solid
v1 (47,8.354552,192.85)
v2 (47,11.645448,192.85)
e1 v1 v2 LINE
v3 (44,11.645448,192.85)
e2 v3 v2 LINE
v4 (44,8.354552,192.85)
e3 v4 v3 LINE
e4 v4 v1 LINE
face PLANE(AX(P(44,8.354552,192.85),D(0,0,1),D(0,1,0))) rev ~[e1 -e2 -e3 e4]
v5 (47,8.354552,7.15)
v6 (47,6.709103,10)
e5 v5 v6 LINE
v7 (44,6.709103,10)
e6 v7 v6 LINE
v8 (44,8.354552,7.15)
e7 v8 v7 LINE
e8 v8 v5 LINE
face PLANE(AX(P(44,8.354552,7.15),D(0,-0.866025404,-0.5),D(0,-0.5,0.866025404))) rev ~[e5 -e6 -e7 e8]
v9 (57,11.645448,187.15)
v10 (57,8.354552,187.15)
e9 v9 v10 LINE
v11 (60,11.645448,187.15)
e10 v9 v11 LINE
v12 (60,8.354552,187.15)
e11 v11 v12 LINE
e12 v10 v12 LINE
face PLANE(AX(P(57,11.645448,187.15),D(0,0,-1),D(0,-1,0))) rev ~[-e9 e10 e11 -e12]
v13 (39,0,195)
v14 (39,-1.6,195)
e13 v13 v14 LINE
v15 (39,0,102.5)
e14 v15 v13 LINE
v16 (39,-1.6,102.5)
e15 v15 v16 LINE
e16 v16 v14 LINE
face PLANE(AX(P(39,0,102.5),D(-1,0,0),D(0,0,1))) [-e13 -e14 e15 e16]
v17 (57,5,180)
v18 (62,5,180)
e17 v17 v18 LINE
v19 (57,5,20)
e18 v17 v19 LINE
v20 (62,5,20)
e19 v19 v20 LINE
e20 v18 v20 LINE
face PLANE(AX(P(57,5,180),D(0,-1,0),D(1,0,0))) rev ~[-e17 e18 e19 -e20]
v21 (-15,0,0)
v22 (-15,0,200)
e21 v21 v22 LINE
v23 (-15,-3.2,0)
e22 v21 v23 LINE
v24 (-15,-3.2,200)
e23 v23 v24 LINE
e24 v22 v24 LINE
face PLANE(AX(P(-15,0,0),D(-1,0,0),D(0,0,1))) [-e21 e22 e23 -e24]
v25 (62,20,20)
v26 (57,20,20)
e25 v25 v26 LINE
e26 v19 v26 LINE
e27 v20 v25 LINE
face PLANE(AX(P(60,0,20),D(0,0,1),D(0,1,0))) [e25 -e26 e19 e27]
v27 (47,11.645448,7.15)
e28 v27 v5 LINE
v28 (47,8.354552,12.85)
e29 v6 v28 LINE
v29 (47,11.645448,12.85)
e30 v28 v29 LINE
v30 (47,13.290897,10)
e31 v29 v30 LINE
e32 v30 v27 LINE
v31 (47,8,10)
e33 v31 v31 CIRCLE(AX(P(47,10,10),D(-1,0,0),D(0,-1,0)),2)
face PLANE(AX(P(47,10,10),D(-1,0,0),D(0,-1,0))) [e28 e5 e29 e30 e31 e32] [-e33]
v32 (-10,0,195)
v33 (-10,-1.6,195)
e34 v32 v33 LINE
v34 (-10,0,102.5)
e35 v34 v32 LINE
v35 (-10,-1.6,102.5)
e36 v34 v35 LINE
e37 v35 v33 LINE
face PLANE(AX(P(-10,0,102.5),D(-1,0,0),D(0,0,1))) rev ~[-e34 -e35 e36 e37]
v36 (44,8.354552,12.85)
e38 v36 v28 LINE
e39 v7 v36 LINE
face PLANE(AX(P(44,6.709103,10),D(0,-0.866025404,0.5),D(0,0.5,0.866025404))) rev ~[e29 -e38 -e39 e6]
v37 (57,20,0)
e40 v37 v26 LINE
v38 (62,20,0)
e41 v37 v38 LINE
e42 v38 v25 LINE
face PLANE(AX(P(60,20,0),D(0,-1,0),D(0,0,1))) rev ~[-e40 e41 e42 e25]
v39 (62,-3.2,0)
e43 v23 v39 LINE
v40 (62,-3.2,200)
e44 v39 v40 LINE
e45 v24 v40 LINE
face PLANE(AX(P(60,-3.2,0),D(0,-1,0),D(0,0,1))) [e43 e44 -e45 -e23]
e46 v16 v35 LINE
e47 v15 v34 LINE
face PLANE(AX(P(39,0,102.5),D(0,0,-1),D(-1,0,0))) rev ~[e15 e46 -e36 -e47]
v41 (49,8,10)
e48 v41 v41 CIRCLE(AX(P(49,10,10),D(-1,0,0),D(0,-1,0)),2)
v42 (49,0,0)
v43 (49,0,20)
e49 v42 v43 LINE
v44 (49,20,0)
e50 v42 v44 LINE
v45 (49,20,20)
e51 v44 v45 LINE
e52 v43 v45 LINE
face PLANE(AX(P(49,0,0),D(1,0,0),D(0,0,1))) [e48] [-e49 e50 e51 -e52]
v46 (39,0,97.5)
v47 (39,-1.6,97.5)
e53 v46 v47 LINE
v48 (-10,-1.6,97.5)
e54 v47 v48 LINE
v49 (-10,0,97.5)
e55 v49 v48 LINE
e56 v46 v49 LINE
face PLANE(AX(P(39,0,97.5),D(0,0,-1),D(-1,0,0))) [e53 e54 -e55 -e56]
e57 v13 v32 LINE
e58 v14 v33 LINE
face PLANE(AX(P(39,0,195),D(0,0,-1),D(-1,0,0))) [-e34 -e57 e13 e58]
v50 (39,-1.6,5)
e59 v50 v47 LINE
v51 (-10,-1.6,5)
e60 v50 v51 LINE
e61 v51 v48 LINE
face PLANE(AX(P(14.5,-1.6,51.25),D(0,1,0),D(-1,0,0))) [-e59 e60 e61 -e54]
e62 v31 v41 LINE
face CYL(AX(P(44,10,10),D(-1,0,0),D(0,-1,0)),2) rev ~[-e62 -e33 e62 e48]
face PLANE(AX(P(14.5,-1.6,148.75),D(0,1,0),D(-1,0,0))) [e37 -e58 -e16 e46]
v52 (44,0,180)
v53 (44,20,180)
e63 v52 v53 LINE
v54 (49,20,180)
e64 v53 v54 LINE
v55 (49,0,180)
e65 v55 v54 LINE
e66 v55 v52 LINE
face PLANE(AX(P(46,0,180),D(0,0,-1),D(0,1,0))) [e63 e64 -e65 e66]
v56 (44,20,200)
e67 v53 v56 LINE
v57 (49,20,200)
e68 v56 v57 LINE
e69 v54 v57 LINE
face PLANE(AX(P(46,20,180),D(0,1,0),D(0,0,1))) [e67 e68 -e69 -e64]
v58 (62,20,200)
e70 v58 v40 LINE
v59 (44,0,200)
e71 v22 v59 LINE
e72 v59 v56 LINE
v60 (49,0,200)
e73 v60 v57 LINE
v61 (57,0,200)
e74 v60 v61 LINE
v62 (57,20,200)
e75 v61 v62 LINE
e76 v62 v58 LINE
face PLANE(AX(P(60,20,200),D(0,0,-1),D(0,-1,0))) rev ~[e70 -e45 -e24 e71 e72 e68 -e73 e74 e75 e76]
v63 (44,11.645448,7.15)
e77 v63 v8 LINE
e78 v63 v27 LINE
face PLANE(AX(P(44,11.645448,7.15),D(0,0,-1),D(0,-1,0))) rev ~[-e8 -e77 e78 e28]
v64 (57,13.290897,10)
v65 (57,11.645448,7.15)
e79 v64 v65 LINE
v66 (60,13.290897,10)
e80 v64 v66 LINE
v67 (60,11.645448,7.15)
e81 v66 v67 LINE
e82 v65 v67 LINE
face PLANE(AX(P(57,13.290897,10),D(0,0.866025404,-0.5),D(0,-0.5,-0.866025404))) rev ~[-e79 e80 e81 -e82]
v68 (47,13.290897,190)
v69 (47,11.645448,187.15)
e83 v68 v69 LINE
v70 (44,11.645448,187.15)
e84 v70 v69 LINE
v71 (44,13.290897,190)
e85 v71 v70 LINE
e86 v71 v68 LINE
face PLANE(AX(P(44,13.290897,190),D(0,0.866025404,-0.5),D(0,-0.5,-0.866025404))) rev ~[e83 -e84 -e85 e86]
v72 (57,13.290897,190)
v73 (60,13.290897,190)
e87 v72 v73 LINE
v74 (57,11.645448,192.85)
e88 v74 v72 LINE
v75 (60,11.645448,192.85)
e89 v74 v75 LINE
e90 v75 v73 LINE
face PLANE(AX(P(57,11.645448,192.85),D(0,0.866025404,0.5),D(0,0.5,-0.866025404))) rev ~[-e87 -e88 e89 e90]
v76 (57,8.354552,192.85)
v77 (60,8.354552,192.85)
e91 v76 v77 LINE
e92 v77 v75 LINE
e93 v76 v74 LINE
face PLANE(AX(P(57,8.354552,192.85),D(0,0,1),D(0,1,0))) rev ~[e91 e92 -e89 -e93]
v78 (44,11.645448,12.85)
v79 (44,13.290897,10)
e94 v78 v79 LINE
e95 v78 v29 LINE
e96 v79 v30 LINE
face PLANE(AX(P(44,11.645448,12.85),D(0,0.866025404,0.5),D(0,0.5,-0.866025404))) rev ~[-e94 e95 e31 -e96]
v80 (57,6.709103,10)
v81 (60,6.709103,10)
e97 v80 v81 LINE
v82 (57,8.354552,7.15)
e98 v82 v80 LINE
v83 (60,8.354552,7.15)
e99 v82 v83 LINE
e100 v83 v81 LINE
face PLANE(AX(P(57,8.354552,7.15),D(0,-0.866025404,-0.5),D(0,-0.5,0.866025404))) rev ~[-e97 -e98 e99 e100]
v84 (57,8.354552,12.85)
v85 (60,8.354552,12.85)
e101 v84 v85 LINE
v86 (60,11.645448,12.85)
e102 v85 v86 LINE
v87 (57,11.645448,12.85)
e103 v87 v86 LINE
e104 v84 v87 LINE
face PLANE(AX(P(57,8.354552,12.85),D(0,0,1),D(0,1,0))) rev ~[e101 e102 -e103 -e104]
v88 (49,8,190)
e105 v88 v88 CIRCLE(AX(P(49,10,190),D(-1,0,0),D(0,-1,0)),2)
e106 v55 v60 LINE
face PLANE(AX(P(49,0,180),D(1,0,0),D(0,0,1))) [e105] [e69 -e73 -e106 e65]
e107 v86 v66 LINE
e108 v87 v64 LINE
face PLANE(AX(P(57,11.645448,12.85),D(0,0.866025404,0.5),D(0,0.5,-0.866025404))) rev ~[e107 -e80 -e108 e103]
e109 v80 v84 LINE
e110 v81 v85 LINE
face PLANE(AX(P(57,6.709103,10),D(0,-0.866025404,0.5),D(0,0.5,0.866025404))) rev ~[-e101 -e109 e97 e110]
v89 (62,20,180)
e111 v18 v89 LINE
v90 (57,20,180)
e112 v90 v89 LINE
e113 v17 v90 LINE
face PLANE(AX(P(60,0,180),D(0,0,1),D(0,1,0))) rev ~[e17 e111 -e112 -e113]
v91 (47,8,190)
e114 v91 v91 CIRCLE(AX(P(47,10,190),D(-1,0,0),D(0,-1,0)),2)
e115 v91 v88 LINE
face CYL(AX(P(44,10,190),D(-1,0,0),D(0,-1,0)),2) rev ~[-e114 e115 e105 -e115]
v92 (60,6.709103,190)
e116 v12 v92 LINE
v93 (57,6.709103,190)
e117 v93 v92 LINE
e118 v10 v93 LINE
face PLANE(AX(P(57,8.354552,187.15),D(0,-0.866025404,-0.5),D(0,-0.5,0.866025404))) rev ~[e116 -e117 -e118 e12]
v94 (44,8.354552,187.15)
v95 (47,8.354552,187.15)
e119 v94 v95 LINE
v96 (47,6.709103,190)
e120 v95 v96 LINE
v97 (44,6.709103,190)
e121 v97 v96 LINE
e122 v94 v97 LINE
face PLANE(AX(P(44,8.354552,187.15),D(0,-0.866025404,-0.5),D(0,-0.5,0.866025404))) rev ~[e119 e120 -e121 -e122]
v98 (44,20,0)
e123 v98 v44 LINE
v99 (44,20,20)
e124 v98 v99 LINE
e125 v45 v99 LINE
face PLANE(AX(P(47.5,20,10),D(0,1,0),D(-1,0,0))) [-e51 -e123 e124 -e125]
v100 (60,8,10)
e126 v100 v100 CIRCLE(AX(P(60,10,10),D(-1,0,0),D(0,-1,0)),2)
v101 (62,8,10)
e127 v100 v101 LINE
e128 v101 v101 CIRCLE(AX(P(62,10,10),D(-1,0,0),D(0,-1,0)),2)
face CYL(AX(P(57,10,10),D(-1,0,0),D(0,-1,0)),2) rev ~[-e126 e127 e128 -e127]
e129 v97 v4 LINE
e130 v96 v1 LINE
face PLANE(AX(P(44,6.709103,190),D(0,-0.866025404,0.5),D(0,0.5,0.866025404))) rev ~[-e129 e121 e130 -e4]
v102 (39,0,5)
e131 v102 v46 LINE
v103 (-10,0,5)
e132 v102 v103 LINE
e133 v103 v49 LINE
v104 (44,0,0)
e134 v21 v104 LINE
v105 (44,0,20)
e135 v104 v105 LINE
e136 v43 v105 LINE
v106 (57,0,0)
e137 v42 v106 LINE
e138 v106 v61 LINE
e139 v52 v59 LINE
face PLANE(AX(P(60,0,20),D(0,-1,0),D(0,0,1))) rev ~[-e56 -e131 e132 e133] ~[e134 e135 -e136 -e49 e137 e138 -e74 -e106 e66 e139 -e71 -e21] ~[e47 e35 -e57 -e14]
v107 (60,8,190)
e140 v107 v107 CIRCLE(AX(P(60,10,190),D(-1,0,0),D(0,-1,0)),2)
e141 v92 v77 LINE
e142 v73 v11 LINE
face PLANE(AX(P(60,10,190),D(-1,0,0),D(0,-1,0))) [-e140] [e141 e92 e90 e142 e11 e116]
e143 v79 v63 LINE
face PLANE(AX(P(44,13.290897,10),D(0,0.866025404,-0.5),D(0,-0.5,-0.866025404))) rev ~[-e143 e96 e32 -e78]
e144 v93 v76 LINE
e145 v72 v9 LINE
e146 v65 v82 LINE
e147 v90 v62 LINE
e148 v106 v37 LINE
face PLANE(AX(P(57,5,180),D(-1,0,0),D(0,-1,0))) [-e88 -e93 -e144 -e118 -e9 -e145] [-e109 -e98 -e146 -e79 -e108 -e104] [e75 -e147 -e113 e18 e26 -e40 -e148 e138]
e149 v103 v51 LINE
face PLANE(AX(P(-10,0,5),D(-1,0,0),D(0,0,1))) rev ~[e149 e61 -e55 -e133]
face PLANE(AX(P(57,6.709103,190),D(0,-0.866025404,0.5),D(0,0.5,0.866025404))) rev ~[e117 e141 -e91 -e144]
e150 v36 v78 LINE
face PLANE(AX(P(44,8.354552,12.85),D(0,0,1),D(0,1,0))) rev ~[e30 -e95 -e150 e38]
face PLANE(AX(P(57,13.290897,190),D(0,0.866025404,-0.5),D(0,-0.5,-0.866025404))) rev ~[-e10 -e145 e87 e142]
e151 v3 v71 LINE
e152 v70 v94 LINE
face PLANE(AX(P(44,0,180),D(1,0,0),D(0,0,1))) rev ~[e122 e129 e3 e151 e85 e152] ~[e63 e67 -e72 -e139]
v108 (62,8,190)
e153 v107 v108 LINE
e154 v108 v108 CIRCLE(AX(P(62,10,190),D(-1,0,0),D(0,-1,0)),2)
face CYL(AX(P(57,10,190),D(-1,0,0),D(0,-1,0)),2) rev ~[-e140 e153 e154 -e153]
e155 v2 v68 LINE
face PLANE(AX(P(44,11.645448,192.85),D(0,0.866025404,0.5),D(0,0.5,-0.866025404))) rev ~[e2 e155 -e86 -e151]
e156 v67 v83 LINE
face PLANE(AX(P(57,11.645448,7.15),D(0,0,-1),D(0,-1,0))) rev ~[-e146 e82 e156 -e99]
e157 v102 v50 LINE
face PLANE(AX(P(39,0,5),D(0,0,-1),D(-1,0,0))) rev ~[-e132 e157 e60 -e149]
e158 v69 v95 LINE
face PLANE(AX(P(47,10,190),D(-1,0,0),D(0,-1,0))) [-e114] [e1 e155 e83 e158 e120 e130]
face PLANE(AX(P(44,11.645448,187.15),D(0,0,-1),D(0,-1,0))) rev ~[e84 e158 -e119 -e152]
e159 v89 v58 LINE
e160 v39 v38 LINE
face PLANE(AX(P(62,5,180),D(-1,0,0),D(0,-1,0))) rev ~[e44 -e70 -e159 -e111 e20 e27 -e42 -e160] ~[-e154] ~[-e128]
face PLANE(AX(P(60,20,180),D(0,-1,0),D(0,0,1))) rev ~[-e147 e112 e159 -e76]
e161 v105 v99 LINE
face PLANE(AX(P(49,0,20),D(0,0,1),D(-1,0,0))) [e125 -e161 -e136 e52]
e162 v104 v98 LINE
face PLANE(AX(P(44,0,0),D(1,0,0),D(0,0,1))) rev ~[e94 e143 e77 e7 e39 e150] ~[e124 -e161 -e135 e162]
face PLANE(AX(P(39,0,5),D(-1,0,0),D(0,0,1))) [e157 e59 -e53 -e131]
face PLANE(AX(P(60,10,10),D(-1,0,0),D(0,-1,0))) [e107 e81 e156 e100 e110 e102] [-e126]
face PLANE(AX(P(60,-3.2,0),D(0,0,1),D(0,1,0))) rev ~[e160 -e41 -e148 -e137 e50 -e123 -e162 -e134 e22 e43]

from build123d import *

# Parameters (mm, degrees)
F0_W      = 60
F0_H      = 200
F1_DEPTH  = 3.2
F2_W      = 3
F2_H      = 20
F3_DEPTH  = 20
F5_DEPTH  = 15
F6_DEPTH  = 2
F7_DEPTH  = 2
F8_R      = 2
F9_DEPTH  = 3
F10_DEPTH = 25
F11_R     = 2
F12_DEPTH = 3
F13_DEPTH = 25
F14_W     = 5
F14_H     = 5
F15_DEPTH = 160
F16_W     = 49
F16_H     = 92.5
F17_DEPTH = 1.6


with BuildPart() as f1:
    # F0 (on Front) → F1 (new body)
    with BuildSketch(Plane.XZ):
        with Locations((30, 100)):
            Rectangle(F0_W, F0_H)
    extrude(amount=F1_DEPTH)

    # F2 (on face) → F3 (join)
    with BuildSketch(Plane(origin=(0, 0, 0), x_dir=(-1, 0, 0), z_dir=(0, 1, 0))):
        with Locations((-58.5, 190)):
            Rectangle(F2_W, F2_H)
        with Locations((-58.5, 10)):
            Rectangle(F2_W, F2_H)
        with Locations((-47.5, 190)):
            Rectangle(F2_W, F2_H)
        with Locations((-47.5, 10)):
            Rectangle(F2_W, F2_H)
    extrude(amount=F3_DEPTH)

    # F5 (add): a face of the model
    f5_faces = [f1.faces().sort_by_distance(p)[0] for p in [
        (0, -1.6, 100),
    ]]
    extrude(f5_faces, amount=F5_DEPTH)

    # F6 (add): a face of the model
    f6_faces = [f1.faces().sort_by_distance(p)[0] for p in [
        (60, -1.186588964, 100),
    ]]
    extrude(f6_faces, amount=F6_DEPTH)

    # F7 (add): faces of the model
    f7_faces = [f1.faces().sort_by_distance(p)[0] for p in [
        (46, 10, 190),
        (46, 10, 10),
    ]]
    extrude(f7_faces, amount=F7_DEPTH)

    # F8 (on face) → F9 (cut)
    with BuildSketch(Plane(origin=(57, 0, 0), x_dir=(0, -1, 0), z_dir=(-1, 0, 0))):
        Polygon((-6.7091034656, 10), (-8.3545517328, 12.85), (-11.6454482672, 12.85), (-13.2908965344, 10), (-11.6454482672, 7.15), (-8.3545517328, 7.15), align=None)
        with Locations((-10, 10)):
            Circle(F8_R, mode=Mode.SUBTRACT)
        Polygon((-11.6454482672, 187.15), (-8.3545517328, 187.15), (-6.7091034656, 190), (-8.3545517328, 192.85), (-11.6454482672, 192.85), (-13.2908965344, 190), align=None)
        with Locations((-10, 190)):
            Circle(F8_R, mode=Mode.SUBTRACT)
    extrude(amount=-F9_DEPTH, mode=Mode.SUBTRACT)

    # F10 (cut): faces of the model
    f10_faces = [f1.faces().sort_by_distance(p)[0] for p in [
        (57, 10, 10),
        (57, 10, 190),
    ]]
    extrude(f10_faces, amount=-F10_DEPTH, mode=Mode.SUBTRACT)

    # F11 (on face) → F12 (cut)
    with BuildSketch(Plane(origin=(44, 0, 0), x_dir=(0, -1, 0), z_dir=(-1, 0, 0))):
        Polygon((-6.7091034656, 10), (-8.3545517328, 12.85), (-11.6454482672, 12.85), (-13.2908965344, 10), (-11.6454482672, 7.15), (-8.3545517328, 7.15), align=None)
        with Locations((-10, 10)):
            Circle(F11_R, mode=Mode.SUBTRACT)
        Polygon((-11.6454482672, 187.15), (-8.3545517328, 187.15), (-6.7091034656, 190), (-8.3545517328, 192.85), (-11.6454482672, 192.85), (-13.2908965344, 190), align=None)
        with Locations((-10, 190)):
            Circle(F11_R, mode=Mode.SUBTRACT)
    extrude(amount=-F12_DEPTH, mode=Mode.SUBTRACT)

    # F13 (cut): faces of the model
    f13_faces = [f1.faces().sort_by_distance(p)[0] for p in [
        (44, 10, 190),
        (44, 10, 10),
    ]]
    extrude(f13_faces, amount=-F13_DEPTH, mode=Mode.SUBTRACT)

    # F14 (on face) → F15 (join, through all)
    with BuildSketch(Plane(origin=(0, 0, 180), x_dir=(1, 0, 0), z_dir=(0, 0, -1))):
        with Locations((59.5, -2.5)):
            Rectangle(F14_W, F14_H)
    extrude(amount=F15_DEPTH)

    # F16 (on face) → F17 (cut)
    with BuildSketch(Plane(origin=(0, 0, 0), x_dir=(-1, 0, 0), z_dir=(0, 1, 0))):
        with Locations((-14.5, 51.25)):
            Rectangle(F16_W, F16_H)
        with Locations((-14.5, 148.75)):
            Rectangle(F16_W, F16_H)
    extrude(amount=-F17_DEPTH, mode=Mode.SUBTRACT)


solid = f1.part
